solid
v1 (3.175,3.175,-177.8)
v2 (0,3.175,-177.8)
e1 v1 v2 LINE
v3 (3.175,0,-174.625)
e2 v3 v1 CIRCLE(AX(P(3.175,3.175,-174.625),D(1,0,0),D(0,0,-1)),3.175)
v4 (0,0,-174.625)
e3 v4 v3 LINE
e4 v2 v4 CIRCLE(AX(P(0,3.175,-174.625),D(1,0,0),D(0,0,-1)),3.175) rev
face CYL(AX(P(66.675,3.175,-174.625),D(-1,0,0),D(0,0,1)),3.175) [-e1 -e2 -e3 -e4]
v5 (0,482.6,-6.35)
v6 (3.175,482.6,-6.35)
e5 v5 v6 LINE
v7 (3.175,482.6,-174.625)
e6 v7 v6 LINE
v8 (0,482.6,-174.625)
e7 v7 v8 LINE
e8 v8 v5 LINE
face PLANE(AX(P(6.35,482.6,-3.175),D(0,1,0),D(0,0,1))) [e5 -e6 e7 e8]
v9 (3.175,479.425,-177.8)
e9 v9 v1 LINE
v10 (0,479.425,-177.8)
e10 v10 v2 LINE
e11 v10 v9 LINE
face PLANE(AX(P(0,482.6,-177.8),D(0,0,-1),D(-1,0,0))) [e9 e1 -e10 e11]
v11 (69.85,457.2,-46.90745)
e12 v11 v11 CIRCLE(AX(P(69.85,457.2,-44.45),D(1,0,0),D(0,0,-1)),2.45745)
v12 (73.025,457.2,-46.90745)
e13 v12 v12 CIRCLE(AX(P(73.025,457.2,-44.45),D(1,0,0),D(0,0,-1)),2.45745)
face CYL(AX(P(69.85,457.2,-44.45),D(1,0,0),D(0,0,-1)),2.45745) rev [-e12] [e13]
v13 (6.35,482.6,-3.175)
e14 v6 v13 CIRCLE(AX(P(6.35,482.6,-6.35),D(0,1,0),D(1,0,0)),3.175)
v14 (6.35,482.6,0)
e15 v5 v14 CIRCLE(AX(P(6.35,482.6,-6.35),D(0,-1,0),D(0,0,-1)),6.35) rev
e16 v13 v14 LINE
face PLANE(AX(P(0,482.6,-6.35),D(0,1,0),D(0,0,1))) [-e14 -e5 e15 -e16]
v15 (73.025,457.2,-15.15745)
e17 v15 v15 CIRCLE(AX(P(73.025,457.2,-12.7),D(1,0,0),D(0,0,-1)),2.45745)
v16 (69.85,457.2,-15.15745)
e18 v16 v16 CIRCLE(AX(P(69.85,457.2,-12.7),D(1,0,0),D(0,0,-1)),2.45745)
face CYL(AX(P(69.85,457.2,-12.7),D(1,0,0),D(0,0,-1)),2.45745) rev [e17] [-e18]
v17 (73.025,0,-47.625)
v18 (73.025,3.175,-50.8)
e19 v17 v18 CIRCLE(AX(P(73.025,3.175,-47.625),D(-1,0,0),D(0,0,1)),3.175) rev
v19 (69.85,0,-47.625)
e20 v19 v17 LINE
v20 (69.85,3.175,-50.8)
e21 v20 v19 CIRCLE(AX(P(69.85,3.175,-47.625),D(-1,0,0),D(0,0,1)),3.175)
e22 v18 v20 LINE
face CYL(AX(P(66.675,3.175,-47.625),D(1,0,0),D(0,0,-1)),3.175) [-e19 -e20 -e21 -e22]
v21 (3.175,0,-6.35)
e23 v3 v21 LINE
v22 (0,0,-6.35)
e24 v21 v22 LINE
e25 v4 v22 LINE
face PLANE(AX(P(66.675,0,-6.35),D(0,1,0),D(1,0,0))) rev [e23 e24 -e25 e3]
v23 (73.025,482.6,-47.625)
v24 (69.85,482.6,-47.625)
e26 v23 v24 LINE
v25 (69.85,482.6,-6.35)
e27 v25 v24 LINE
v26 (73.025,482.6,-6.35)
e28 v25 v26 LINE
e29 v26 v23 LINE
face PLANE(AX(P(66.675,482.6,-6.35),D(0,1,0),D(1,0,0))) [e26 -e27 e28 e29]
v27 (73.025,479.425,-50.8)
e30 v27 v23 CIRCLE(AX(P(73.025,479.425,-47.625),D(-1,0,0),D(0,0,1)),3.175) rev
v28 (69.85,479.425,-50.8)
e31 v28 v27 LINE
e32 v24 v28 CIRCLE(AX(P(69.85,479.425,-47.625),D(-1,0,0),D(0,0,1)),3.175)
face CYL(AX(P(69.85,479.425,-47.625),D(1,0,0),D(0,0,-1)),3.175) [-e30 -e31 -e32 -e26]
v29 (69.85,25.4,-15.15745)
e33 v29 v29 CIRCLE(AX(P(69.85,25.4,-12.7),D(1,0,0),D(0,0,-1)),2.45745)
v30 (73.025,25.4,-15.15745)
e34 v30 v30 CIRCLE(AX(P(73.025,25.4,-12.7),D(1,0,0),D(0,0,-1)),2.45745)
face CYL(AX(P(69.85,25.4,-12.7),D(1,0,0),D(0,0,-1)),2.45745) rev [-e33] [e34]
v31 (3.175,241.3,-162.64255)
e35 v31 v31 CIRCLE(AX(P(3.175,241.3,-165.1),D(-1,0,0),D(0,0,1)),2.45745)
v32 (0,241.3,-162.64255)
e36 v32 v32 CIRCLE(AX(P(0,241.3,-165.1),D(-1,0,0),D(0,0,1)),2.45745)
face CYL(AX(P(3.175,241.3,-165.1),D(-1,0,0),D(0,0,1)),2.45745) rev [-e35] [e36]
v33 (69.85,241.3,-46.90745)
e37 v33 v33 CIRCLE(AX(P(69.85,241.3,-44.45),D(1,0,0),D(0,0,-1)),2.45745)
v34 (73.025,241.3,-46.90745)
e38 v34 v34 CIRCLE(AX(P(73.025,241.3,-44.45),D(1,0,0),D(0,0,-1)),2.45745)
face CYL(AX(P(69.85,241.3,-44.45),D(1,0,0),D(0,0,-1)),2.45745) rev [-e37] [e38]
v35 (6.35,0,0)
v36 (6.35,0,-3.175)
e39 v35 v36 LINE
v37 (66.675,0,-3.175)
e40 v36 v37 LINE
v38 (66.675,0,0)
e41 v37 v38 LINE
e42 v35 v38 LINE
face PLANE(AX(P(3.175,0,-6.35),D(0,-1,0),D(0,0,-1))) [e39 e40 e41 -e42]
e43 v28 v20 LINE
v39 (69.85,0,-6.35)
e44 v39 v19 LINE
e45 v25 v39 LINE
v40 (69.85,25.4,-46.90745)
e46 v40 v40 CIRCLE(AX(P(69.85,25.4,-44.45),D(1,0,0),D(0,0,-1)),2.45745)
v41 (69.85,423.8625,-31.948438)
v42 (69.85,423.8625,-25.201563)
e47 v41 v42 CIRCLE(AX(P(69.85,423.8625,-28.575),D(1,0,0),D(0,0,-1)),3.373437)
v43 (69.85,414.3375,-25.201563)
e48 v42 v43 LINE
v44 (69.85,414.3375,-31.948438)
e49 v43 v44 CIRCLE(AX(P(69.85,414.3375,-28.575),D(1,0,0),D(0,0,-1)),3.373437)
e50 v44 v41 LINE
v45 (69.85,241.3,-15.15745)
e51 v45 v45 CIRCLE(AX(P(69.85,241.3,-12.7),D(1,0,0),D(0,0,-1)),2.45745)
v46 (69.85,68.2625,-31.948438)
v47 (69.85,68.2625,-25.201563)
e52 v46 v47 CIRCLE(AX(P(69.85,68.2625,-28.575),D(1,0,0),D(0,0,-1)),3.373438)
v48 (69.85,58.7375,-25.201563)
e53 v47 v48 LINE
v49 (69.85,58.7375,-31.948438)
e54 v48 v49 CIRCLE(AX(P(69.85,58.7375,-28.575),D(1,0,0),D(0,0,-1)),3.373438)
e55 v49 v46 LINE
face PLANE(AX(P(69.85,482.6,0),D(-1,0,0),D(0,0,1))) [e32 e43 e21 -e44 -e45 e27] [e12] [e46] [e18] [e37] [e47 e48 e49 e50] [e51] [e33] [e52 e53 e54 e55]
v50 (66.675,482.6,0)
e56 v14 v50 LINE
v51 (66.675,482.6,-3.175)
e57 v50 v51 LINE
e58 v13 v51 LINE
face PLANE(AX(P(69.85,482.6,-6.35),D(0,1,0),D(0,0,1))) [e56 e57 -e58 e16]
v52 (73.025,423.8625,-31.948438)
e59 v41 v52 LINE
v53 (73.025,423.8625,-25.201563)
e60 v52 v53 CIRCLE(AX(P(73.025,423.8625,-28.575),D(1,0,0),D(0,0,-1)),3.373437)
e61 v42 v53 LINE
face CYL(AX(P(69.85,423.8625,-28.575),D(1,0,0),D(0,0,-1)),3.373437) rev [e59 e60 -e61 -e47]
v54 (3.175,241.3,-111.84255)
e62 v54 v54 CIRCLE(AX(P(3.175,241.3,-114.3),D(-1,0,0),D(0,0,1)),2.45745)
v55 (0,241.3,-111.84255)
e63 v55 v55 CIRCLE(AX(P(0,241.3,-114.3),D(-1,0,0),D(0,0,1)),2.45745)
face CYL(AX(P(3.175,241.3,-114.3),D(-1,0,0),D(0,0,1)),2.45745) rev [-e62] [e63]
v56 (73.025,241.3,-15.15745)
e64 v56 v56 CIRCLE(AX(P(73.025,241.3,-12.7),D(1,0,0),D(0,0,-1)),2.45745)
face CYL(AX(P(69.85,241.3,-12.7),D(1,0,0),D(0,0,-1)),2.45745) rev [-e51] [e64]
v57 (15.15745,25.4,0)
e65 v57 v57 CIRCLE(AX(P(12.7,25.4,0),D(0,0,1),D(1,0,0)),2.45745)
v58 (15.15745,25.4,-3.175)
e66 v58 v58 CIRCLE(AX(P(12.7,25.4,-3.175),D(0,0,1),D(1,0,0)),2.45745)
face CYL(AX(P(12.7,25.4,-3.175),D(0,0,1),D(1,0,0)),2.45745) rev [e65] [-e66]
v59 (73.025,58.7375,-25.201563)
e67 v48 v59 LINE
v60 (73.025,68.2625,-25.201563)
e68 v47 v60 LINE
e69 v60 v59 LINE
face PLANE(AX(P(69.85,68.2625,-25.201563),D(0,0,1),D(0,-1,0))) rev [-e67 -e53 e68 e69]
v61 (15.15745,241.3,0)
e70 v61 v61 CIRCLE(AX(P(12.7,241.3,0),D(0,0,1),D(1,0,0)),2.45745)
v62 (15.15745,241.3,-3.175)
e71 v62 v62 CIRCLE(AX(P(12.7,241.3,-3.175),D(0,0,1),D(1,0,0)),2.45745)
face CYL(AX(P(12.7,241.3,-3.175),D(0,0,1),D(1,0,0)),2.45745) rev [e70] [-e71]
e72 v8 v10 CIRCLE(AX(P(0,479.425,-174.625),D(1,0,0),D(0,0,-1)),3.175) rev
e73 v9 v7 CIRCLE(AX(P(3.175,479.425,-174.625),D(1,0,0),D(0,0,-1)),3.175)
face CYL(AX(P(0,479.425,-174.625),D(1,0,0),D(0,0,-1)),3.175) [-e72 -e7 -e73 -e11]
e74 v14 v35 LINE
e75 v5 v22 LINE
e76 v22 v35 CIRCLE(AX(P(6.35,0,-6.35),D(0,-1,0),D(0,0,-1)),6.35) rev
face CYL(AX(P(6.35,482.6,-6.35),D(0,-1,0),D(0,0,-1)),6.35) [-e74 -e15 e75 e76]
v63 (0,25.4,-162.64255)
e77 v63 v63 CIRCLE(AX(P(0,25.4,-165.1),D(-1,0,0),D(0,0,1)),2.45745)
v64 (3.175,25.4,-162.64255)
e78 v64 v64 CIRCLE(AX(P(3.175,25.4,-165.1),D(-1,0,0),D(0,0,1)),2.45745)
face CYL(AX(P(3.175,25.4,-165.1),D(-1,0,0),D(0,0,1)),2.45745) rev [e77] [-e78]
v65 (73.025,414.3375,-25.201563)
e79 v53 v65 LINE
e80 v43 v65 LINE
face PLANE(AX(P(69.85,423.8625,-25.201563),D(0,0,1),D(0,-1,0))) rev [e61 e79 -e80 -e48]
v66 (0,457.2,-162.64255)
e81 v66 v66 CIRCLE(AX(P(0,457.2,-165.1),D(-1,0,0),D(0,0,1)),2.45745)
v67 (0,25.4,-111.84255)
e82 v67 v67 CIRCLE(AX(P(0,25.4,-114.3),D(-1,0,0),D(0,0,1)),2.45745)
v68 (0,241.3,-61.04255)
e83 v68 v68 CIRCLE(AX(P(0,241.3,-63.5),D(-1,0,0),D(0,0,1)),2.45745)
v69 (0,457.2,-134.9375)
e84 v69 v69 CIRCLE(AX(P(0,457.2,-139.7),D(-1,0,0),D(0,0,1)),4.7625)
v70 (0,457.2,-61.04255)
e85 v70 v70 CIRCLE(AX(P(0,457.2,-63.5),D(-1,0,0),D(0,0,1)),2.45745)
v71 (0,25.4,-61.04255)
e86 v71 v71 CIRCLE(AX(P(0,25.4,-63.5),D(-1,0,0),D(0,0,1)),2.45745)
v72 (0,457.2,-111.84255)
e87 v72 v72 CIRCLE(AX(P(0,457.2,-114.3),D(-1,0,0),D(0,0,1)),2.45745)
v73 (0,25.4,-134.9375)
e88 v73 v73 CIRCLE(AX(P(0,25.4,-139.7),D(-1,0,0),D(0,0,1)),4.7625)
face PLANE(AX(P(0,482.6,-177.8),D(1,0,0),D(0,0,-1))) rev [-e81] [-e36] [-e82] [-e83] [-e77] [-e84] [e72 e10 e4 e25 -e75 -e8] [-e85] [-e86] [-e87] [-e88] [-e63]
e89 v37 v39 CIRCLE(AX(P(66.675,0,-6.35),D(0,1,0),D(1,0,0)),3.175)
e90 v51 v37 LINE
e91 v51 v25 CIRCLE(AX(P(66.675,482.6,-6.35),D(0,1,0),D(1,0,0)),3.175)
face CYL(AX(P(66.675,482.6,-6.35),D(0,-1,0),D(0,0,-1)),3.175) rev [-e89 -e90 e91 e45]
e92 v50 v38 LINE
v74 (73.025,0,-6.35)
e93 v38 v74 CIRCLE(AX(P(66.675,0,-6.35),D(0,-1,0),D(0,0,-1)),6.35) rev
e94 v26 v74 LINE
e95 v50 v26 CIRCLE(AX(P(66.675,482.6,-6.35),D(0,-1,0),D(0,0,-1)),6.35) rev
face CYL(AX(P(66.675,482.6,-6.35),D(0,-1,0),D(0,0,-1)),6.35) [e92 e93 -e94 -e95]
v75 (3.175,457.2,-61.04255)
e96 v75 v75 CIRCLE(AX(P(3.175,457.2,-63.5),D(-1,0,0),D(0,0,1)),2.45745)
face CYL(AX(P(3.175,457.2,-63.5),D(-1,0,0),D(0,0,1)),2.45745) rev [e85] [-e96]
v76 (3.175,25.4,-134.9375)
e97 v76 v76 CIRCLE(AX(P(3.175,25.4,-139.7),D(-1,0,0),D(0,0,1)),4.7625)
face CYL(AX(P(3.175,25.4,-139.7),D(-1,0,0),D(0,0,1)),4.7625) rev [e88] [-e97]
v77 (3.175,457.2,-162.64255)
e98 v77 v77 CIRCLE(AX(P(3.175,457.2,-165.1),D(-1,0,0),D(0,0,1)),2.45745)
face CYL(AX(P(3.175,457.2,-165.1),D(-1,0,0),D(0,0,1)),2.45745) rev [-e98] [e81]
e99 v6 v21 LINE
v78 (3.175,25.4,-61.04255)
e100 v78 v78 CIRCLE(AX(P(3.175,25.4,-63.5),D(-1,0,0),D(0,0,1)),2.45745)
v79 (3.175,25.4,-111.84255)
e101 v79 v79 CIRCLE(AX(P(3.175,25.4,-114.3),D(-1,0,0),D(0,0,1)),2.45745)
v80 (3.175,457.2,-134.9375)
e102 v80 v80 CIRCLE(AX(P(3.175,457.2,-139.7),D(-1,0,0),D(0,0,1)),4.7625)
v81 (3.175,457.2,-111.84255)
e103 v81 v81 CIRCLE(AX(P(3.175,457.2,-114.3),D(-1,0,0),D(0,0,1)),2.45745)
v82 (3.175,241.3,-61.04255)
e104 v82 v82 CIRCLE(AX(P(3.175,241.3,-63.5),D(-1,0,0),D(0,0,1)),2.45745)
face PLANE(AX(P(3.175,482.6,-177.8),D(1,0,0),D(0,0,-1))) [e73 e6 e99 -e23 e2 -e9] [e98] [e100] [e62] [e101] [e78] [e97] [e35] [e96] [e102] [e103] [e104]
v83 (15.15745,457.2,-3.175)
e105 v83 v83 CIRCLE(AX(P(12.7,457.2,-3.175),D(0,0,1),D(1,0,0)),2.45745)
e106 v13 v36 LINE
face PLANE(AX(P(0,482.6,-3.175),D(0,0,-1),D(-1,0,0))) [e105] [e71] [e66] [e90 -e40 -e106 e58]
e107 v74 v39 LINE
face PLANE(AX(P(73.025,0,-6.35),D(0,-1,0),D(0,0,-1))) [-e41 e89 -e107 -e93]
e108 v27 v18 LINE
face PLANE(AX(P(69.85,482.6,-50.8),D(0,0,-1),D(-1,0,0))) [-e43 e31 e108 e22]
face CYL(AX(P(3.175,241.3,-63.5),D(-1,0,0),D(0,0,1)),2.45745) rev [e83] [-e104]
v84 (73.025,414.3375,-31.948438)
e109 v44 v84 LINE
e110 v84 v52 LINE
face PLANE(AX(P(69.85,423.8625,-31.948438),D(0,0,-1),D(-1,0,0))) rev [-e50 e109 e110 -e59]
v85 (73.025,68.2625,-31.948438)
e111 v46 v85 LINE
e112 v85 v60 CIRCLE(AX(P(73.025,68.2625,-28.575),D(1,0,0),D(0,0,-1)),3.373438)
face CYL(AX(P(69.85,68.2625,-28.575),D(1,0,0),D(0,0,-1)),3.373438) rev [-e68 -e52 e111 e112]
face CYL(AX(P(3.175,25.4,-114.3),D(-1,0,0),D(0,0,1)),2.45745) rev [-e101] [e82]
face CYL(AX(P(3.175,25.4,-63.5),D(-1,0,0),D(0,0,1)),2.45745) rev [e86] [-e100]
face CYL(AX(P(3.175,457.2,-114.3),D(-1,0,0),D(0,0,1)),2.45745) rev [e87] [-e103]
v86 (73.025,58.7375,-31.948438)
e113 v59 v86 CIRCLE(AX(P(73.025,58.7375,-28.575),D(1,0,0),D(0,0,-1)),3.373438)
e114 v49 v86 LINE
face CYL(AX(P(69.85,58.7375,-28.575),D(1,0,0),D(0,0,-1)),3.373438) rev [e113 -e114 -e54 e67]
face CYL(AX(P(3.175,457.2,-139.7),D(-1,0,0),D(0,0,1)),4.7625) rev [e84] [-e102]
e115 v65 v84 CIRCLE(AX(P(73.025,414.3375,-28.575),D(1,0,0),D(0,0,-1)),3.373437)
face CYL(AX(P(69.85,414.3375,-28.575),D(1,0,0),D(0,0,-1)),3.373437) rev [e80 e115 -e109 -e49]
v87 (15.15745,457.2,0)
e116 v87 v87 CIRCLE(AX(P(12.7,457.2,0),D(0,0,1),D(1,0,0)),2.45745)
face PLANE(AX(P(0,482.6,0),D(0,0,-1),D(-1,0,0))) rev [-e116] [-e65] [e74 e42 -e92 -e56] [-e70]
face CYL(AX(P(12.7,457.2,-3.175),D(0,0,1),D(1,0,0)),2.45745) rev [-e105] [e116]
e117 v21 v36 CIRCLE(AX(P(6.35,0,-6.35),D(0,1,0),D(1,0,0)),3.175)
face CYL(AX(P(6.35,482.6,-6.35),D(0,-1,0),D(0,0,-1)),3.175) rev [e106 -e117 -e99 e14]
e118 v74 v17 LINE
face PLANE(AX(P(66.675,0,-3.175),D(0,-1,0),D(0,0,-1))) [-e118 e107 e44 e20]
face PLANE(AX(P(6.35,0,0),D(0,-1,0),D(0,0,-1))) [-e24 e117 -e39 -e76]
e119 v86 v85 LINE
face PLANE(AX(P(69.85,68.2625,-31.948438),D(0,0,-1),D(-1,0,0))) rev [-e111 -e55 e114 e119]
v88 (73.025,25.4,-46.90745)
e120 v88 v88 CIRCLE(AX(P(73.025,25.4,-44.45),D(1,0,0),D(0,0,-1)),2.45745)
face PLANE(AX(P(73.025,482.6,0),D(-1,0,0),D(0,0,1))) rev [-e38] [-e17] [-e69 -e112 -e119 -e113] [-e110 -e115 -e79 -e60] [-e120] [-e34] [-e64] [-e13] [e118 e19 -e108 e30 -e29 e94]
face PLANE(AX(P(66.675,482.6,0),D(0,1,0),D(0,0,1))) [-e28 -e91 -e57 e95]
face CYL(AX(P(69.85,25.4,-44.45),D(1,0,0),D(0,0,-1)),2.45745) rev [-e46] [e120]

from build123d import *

# Parameters (mm, degrees)
BASE_FLANGE1_DEPTH = 482.6
SKETCH2_R          = 2.45745
CUT_EXTRUDE1_DEPTH = 3.175
SKETCH3_R          = 2.45745
SKETCH3_R_2        = 4.7625
CUT_EXTRUDE2_DEPTH = 3.175
SKETCH4_R          = 2.45745
CUT_EXTRUDE3_DEPTH = 3.175
FILLET1_R          = 3.175


# Sheet-metal steps are written as plain solids
with BuildPart() as part:
    # Sketch1 → Base-Flange1 (new body)
    with BuildSketch(Plane(origin=(0, 0, 0), x_dir=(1, 0, 0), z_dir=(0, 1, 0))):
        with BuildLine():
            Line((0, 177.8), (0, 6.35))
            ThreePointArc((0, 6.35), (1.859871939, 1.859871939), (6.35, 0))
            Line((6.35, 0), (66.675, 0))
            ThreePointArc((66.675, 0), (71.165128061, 1.859871939), (73.025, 6.35))
            Line((73.025, 6.35), (73.025, 50.8))
            Line((73.025, 50.8), (69.85, 50.8))
            Line((69.85, 50.8), (69.85, 6.35))
            ThreePointArc((69.85, 6.35), (68.92006403, 4.10493597), (66.675, 3.175))
            Line((66.675, 3.175), (6.35, 3.175))
            ThreePointArc((6.35, 3.175), (4.10493597, 4.10493597), (3.175, 6.35))
            Line((3.175, 6.35), (3.175, 177.8))
            Line((3.175, 177.8), (0, 177.8))
        make_face()
    extrude(amount=BASE_FLANGE1_DEPTH)

    # Sketch2 → Cut-Extrude1 (cut)
    with BuildSketch(Plane(origin=(73.025, 0, 0), x_dir=(0, 0, -1), z_dir=(1, 0, 0))):
        with Locations((12.7, 457.2)):
            Circle(SKETCH2_R)
        with Locations((44.45, 457.2)):
            Circle(SKETCH2_R)
        with Locations((12.7, 25.4)):
            Circle(SKETCH2_R)
        with Locations((44.45, 25.4)):
            Circle(SKETCH2_R)
        with Locations((44.45, 241.3)):
            Circle(SKETCH2_R)
        with Locations((12.7, 241.3)):
            Circle(SKETCH2_R)
        with BuildLine():
            Line((31.9484375, 423.8625), (31.9484375, 414.3375))
            ThreePointArc((31.9484375, 414.3375), (28.575, 410.9640625), (25.2015625, 414.3375))
            Line((25.2015625, 414.3375), (25.2015625, 423.8625))
            ThreePointArc((25.2015625, 423.8625), (28.575, 427.2359375), (31.9484375, 423.8625))
        make_face()
        with BuildLine():
            Line((31.9484375, 68.2625), (31.9484375, 58.7375))
            ThreePointArc((31.9484375, 58.7375), (28.575, 55.3640625), (25.2015625, 58.7375))
            Line((25.2015625, 58.7375), (25.2015625, 68.2625))
            ThreePointArc((25.2015625, 68.2625), (28.575, 71.6359375), (31.9484375, 68.2625))
        make_face()
    extrude(amount=-CUT_EXTRUDE1_DEPTH, mode=Mode.SUBTRACT)

    # Sketch3 → Cut-Extrude2 (cut)
    with BuildSketch(Plane.ZY):
        with Locations((-165.1, 457.2)):
            Circle(SKETCH3_R)
        with Locations((-165.1, 25.4)):
            Circle(SKETCH3_R)
        with Locations((-165.1, 241.3)):
            Circle(SKETCH3_R)
        with Locations((-114.3, 25.4)):
            Circle(SKETCH3_R)
        with Locations((-114.3, 241.3)):
            Circle(SKETCH3_R)
        with Locations((-114.3, 457.2)):
            Circle(SKETCH3_R)
        with Locations((-63.5, 25.4)):
            Circle(SKETCH3_R)
        with Locations((-63.5, 241.3)):
            Circle(SKETCH3_R)
        with Locations((-63.5, 457.2)):
            Circle(SKETCH3_R)
        with Locations((-139.7, 457.2)):
            Circle(SKETCH3_R_2)
        with Locations((-139.7, 25.4)):
            Circle(SKETCH3_R_2)
    extrude(amount=-CUT_EXTRUDE2_DEPTH, mode=Mode.SUBTRACT)

    # Sketch4 → Cut-Extrude3 (cut)
    with BuildSketch(Plane.XY):
        with Locations((12.7, 457.2)):
            Circle(SKETCH4_R)
        with Locations((12.7, 241.3)):
            Circle(SKETCH4_R)
        with Locations((12.7, 25.4)):
            Circle(SKETCH4_R)
    extrude(amount=-CUT_EXTRUDE3_DEPTH, mode=Mode.SUBTRACT)

    # Fillet1
    fillet1_edges = [part.edges().sort_by_distance(p)[0] for p in [
        (1.5875, 0, -177.8),
        (71.4375, 0, -50.8),
        (1.5875, 482.6, -177.8),
        (71.4375, 482.6, -50.8),
    ]]
    fillet(fillet1_edges, radius=FILLET1_R)


solid = part.part
